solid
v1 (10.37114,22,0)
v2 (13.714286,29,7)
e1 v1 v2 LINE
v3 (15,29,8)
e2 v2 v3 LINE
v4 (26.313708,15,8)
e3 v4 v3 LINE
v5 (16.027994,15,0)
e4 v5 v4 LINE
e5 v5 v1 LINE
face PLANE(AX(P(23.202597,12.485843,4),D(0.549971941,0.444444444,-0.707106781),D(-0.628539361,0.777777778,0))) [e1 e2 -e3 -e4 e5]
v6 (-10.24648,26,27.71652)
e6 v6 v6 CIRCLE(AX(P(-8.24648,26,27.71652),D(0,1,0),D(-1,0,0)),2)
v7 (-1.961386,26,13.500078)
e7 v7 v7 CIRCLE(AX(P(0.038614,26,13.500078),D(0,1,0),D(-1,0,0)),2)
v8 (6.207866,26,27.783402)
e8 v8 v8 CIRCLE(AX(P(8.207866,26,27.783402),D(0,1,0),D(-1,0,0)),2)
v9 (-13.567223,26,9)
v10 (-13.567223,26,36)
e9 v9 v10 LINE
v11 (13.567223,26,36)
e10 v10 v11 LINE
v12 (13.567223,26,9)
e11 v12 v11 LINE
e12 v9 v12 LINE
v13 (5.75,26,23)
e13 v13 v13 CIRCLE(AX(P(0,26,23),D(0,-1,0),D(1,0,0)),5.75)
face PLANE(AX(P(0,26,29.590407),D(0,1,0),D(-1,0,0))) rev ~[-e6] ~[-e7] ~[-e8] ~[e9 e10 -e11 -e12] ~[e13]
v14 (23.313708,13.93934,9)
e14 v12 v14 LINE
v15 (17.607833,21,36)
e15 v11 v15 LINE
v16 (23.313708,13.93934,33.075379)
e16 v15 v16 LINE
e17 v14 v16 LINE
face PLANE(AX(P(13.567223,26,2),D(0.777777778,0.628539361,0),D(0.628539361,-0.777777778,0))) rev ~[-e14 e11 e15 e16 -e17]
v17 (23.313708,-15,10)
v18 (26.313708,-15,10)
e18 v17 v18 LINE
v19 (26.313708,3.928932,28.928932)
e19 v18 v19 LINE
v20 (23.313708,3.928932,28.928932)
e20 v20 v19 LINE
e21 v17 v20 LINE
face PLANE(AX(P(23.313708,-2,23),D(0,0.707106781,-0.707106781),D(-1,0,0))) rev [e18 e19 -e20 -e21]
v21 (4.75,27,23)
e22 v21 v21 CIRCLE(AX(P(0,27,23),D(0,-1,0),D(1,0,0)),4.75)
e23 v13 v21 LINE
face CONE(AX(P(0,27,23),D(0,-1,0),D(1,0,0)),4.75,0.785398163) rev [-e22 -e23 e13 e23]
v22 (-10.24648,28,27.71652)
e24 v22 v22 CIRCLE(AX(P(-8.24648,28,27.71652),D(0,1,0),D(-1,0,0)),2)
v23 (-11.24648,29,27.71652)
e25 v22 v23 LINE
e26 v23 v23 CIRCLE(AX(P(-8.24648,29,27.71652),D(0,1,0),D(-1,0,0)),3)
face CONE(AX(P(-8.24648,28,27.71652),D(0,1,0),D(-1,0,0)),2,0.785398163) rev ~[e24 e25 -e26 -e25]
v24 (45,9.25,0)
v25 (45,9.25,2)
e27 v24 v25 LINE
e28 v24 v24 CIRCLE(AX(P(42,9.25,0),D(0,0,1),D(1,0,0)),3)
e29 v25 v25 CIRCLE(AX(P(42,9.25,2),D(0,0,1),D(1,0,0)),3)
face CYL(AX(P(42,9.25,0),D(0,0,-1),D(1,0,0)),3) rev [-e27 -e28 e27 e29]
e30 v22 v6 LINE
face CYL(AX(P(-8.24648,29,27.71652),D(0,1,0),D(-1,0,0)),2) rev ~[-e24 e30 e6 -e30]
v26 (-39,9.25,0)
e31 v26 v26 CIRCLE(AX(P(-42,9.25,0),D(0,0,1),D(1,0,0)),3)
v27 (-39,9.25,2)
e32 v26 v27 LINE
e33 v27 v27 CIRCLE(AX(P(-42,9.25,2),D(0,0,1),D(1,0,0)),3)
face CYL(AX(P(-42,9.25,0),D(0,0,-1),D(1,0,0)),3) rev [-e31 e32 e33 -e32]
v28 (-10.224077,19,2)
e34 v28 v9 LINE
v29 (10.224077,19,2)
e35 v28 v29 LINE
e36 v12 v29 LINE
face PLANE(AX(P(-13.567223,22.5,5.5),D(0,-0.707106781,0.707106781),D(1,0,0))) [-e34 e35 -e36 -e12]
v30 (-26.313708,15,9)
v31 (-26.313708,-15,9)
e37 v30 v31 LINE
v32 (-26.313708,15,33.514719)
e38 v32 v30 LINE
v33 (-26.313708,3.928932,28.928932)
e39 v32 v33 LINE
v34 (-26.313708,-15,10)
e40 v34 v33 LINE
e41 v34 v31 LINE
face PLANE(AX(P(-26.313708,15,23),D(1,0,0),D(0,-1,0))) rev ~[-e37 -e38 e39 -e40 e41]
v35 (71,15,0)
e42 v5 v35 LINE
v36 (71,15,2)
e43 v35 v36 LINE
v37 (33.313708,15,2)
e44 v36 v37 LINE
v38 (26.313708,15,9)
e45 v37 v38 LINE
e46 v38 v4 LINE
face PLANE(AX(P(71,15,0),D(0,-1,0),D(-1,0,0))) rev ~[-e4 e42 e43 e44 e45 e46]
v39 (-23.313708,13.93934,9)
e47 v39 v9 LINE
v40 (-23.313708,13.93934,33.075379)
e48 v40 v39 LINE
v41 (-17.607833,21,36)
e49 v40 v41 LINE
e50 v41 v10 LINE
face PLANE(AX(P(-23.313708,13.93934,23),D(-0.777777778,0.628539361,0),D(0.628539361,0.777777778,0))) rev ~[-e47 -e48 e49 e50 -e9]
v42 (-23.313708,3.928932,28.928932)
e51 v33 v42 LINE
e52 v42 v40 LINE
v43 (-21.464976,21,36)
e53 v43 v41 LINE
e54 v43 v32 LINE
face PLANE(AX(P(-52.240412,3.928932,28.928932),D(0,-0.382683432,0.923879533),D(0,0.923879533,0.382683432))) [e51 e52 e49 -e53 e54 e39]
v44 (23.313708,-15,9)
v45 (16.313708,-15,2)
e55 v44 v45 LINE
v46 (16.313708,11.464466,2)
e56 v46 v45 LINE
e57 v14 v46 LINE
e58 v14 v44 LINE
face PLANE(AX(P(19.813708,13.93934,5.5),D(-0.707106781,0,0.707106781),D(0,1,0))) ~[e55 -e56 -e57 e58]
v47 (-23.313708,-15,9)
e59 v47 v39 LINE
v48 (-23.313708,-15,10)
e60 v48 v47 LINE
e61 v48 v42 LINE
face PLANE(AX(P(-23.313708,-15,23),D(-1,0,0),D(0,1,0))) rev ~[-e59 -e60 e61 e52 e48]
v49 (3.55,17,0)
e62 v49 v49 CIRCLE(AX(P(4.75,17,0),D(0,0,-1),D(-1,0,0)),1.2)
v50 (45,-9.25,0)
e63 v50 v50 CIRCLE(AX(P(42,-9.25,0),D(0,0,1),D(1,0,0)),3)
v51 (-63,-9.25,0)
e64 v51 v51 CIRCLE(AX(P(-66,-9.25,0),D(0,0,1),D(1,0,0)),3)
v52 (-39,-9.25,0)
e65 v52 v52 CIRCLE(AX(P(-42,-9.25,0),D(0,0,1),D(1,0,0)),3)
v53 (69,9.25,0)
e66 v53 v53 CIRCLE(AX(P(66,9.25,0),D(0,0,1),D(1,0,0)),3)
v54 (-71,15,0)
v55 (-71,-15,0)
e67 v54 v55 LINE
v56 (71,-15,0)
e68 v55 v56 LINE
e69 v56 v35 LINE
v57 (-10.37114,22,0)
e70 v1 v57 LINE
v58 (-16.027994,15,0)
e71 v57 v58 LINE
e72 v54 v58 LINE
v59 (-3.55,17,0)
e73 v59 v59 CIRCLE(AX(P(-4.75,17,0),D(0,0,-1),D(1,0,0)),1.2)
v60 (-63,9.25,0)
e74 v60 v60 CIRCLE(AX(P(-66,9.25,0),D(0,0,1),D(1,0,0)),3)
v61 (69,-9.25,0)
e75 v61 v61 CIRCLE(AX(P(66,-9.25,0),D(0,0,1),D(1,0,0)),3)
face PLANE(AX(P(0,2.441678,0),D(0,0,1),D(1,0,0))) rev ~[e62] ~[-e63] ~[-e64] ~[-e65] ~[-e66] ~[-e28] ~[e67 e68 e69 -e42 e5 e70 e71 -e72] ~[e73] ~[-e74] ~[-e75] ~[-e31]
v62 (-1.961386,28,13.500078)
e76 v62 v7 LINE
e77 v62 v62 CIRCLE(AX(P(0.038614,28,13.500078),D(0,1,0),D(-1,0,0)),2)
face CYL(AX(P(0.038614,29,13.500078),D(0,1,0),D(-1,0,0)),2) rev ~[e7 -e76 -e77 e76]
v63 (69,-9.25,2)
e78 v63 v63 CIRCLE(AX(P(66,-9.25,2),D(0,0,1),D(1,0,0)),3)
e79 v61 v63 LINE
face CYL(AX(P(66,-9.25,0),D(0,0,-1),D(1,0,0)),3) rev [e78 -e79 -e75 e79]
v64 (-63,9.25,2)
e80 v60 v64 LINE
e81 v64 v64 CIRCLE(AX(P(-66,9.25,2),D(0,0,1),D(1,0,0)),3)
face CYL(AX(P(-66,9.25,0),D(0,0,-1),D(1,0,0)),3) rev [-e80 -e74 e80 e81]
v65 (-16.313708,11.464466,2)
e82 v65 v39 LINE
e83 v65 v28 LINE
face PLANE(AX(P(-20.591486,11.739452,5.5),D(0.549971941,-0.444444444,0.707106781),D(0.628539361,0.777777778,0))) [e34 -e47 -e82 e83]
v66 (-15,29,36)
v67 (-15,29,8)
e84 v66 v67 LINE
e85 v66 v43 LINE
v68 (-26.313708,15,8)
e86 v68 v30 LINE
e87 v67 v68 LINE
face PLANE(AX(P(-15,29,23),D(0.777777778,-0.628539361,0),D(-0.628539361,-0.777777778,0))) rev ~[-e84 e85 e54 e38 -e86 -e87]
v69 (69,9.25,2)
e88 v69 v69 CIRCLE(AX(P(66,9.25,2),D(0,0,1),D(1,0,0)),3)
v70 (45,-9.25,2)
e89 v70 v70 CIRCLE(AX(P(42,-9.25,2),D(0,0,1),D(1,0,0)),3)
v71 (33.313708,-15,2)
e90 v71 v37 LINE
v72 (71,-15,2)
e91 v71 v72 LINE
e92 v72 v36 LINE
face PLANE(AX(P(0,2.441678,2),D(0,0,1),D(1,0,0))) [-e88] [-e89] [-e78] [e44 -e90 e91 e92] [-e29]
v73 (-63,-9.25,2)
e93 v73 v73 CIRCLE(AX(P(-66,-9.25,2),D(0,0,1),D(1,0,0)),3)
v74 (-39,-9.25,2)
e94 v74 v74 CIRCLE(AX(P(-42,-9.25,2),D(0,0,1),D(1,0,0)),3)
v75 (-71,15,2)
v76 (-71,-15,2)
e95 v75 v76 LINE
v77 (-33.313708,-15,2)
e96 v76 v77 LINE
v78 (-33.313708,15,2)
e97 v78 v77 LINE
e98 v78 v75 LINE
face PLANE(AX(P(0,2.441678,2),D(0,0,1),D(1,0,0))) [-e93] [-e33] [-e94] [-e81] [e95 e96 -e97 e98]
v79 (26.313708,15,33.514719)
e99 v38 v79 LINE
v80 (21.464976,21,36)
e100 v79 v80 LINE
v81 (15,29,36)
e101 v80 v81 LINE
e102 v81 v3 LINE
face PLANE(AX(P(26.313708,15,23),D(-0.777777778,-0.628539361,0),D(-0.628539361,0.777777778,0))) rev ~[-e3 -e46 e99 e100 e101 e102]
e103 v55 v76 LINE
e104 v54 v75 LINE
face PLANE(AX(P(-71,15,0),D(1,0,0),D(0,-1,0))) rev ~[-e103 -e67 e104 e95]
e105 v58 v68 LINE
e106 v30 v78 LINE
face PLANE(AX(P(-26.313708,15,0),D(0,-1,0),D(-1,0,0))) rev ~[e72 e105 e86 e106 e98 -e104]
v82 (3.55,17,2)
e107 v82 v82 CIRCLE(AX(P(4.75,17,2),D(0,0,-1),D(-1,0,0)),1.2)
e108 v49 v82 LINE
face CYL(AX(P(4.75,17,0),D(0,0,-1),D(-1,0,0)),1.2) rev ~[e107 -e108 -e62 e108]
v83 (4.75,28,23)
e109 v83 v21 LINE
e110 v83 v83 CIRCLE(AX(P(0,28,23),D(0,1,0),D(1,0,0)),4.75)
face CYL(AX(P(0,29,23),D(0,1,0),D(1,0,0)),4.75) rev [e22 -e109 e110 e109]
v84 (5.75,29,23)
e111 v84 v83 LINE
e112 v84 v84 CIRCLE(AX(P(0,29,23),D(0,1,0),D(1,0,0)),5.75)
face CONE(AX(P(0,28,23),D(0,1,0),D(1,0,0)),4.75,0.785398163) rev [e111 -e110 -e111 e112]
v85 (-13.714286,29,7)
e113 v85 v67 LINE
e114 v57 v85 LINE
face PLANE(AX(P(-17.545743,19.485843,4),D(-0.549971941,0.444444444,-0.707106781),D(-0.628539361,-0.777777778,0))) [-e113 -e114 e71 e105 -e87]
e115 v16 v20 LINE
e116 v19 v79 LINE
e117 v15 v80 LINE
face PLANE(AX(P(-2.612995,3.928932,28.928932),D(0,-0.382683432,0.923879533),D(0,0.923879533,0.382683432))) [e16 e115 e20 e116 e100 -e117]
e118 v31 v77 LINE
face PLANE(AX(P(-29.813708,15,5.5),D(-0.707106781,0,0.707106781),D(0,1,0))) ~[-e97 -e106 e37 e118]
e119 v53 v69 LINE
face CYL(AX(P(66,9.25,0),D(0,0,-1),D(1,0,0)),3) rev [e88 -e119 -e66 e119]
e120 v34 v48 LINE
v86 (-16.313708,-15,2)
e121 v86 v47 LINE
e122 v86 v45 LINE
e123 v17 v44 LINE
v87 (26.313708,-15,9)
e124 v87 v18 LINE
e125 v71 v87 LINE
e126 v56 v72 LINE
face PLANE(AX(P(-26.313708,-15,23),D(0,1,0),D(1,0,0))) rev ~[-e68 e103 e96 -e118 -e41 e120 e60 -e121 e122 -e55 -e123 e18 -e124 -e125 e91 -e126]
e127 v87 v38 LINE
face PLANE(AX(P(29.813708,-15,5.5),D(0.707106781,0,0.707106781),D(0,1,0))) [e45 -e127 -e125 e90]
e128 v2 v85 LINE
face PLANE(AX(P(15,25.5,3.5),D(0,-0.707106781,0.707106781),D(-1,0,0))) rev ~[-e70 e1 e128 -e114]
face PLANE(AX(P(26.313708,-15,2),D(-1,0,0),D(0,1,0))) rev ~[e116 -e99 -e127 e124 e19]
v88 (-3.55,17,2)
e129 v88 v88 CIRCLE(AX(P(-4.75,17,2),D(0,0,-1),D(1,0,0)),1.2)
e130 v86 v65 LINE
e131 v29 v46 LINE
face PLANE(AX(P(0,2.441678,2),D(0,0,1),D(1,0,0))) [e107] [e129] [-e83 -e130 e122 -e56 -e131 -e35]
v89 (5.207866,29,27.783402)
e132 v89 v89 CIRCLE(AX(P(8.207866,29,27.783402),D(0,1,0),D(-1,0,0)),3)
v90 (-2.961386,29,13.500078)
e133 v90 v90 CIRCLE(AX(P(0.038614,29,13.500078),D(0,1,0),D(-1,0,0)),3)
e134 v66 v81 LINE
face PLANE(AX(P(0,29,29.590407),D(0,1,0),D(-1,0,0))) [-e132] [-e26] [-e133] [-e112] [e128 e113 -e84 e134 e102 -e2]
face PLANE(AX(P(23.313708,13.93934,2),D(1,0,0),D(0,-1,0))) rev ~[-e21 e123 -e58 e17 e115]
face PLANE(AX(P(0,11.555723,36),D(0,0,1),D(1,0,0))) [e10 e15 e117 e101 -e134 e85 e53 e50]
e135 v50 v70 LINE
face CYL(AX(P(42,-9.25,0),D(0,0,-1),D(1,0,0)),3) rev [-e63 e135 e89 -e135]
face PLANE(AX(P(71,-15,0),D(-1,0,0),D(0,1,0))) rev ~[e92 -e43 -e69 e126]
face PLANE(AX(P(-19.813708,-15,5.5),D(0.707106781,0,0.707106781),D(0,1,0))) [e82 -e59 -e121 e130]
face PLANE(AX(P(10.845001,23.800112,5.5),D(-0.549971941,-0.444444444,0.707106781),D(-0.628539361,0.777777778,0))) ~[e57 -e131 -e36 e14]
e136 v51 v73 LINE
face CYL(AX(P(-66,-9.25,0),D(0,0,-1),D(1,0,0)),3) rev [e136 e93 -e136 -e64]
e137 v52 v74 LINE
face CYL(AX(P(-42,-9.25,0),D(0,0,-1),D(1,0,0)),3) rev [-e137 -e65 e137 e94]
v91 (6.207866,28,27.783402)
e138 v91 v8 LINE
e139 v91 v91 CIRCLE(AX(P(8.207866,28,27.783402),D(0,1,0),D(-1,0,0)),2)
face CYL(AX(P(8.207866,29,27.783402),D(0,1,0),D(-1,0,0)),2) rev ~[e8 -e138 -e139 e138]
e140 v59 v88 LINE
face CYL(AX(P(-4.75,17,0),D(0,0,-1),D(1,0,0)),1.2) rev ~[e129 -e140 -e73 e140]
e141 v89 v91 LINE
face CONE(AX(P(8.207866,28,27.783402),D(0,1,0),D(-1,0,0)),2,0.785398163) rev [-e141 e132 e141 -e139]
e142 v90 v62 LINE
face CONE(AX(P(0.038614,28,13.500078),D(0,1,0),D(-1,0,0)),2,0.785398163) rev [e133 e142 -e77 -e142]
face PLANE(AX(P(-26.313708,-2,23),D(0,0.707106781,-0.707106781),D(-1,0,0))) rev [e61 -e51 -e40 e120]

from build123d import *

# Parameters (mm, degrees)
F0_R         = 3
F1_DEPTH     = 2
F3_DEPTH     = 21
F4_R         = 2
F5_DEPTH     = 3
F6_DEPTH     = 44.001
F7_SIZE      = 7
F8_DEPTH     = 13
F9_SIZE      = 26
F10_T1_DEPTH = 54.8534078581
F10_T3_DEPTH = 54.8534078581
F11_SIZE     = 8
F12_SIZE     = 1
F13_SIZE     = 1
F14_R        = 1.2
F15_DEPTH    = 2


# Not quite as in the source:
# - a fillet or chamfer that OpenCascade refuses, or shapes differently, is made with other operations: its cross-section is extruded or revolved along the edge and cut away or added


with BuildPart() as f1:
    # F0 (on Top) → F1 (new body)
    with BuildSketch(Plane.XY):
        Polygon((-71, -15), (71, -15), (71, 15), (26.313708499, 15), (15, 29), (-15, 29), (-26.313708499, 15), (-71, 15), align=None)
        with Locations((-66, -9.25)):
            Circle(F0_R, mode=Mode.SUBTRACT)
        with Locations((-42, -9.25)):
            Circle(F0_R, mode=Mode.SUBTRACT)
        with Locations((42, -9.25)):
            Circle(F0_R, mode=Mode.SUBTRACT)
        with Locations((66, -9.25)):
            Circle(F0_R, mode=Mode.SUBTRACT)
        with Locations((-66, 9.25)):
            Circle(F0_R, mode=Mode.SUBTRACT)
        with Locations((-42, 9.25)):
            Circle(F0_R, mode=Mode.SUBTRACT)
        with Locations((42, 9.25)):
            Circle(F0_R, mode=Mode.SUBTRACT)
        with Locations((66, 9.25)):
            Circle(F0_R, mode=Mode.SUBTRACT)
    extrude(amount=F1_DEPTH)

    # F2 (on face) → F3 (join)
    with BuildSketch(Plane.XY.offset(2)):
        Polygon((-15, 29), (-26.313708499, 15), (-26.313708499, -15), (-23.313708499, -15), (-23.313708499, 13.9393398282), (-13.5672232498, 26), (13.5672232498, 26), (23.313708499, 13.9393398282), (23.313708499, -15), (26.313708499, -15), (26.313708499, 15), (15, 29), align=None)
    extrude(amount=F3_DEPTH)

    # F4 (on face) → F5 (join)
    with BuildSketch(Plane(origin=(0, 29, 0), x_dir=(-1, 0, 0), z_dir=(0, 1, 0))):
        with BuildLine():
            ThreePointArc((-4.75, 23), (0, 27.75), (4.75, 23))
            Line((4.75, 23), (15, 23))
            Line((15, 23), (15, 36))
            Line((15, 36), (0, 36))
            Line((0, 36), (-15, 36))
            Line((-15, 36), (-15, 23))
            Line((-15, 23), (-4.75, 23))
        make_face()
        with Locations((-8.2078662679, 27.7834016482)):
            Circle(F4_R, mode=Mode.SUBTRACT)
        with Locations((8.2464804778, 27.7165198748)):
            Circle(F4_R, mode=Mode.SUBTRACT)
    extrude(amount=-F5_DEPTH)

    # F4 (on face) → F6 (cut, through all)
    with BuildSketch(Plane(origin=(0, 29, 0), x_dir=(-1, 0, 0), z_dir=(0, 1, 0))):
        with Locations((-8.2078662679, 27.7834016482)):
            Circle(F4_R)
        with BuildLine():
            ThreePointArc((-4.75, 23), (0, 18.25), (4.75, 23))
            Line((4.75, 23), (-4.75, 23))
        make_face()
        with Locations((-0.0386142099, 13.500078477)):
            Circle(F4_R)
    extrude(amount=-F6_DEPTH, mode=Mode.SUBTRACT)

    # F7
    f7_edges = [f1.edges().sort_by_distance(p)[0] for p in [
        (-26.313708, 0, 2),
        (23.313708, -0.53033, 2),
        (18.440466, 19.96967, 2),
        (-18.440466, 19.96967, 2),
        (-23.313708, -0.53033, 2),
        (26.313708, 0, 2),
        (0, 26, 2),
        (0, 29, 0),
    ]]
    chamfer(f7_edges, length=F7_SIZE)

    # F8 (add): faces of the model
    f8_faces = [f1.faces().sort_by_distance(p)[0] for p in [
        (-15.4580909174, 27.5, 23),
        (25.8556175816, 0, 23),
    ]]
    extrude(f8_faces, amount=F8_DEPTH)

    # F9
    f9_edges = [f1.edges().sort_by_distance(p)[0] for p in [
        (-24.813708, -15, 36),
        (24.813708, -15, 36),
    ]]
    chamfer(f9_edges, length=F9_SIZE)

    # F10: chamfer of 10 on 2 edges, made by hand

    # F10_s2 → F10_t1 (cut)
    with BuildSketch(Plane.YZ.offset(-52.2404124281)):
        Polygon((3.9289321881, 28.9289321881), (21, 36), (11, 36), align=None)
    extrude(amount=F10_T1_DEPTH, mode=Mode.SUBTRACT)

    # F10_s4 → F10_t3 (cut)
    with BuildSketch(Plane.YZ.offset(-2.6129954301)):
        Polygon((3.9289321881, 28.9289321881), (21, 36), (11, 36), align=None)
    extrude(amount=F10_T3_DEPTH, mode=Mode.SUBTRACT)

    # F11
    f11_edges = [f1.edges().sort_by_distance(p)[0] for p in [
        (23.485281, 18.5, 0),
        (-23.485281, 18.5, 0),
    ]]
    chamfer(f11_edges, length=F11_SIZE)

    # F12
    f12_edges = [f1.edges().sort_by_distance(p)[0] for p in [
        (2.038614, 29, 13.500078),
        (10.207866, 29, 27.783402),
        (-6.24648, 29, 27.71652),
    ]]
    chamfer(f12_edges, length=F12_SIZE)

    # F13
    f13_edges = [f1.edges().sort_by_distance(p)[0] for p in [
        (-4.75, 26, 23),
        (-4.75, 29, 23),
    ]]
    chamfer(f13_edges, length=F13_SIZE)

    # F14 (on face) → F15 (cut, through all)
    with BuildSketch(Plane(origin=(0, 0, 0), x_dir=(1, 0, 0), z_dir=(0, 0, -1))):
        with Locations((-4.75, -17)):
            Circle(F14_R)
        with BuildLine():
            ThreePointArc((5.95, -17), (4.75, -15.8), (3.55, -17))
            ThreePointArc((3.55, -17), (4.75, -18.2), (5.95, -17))
        make_face()
    extrude(amount=-F15_DEPTH, mode=Mode.SUBTRACT)


solid = f1.part
